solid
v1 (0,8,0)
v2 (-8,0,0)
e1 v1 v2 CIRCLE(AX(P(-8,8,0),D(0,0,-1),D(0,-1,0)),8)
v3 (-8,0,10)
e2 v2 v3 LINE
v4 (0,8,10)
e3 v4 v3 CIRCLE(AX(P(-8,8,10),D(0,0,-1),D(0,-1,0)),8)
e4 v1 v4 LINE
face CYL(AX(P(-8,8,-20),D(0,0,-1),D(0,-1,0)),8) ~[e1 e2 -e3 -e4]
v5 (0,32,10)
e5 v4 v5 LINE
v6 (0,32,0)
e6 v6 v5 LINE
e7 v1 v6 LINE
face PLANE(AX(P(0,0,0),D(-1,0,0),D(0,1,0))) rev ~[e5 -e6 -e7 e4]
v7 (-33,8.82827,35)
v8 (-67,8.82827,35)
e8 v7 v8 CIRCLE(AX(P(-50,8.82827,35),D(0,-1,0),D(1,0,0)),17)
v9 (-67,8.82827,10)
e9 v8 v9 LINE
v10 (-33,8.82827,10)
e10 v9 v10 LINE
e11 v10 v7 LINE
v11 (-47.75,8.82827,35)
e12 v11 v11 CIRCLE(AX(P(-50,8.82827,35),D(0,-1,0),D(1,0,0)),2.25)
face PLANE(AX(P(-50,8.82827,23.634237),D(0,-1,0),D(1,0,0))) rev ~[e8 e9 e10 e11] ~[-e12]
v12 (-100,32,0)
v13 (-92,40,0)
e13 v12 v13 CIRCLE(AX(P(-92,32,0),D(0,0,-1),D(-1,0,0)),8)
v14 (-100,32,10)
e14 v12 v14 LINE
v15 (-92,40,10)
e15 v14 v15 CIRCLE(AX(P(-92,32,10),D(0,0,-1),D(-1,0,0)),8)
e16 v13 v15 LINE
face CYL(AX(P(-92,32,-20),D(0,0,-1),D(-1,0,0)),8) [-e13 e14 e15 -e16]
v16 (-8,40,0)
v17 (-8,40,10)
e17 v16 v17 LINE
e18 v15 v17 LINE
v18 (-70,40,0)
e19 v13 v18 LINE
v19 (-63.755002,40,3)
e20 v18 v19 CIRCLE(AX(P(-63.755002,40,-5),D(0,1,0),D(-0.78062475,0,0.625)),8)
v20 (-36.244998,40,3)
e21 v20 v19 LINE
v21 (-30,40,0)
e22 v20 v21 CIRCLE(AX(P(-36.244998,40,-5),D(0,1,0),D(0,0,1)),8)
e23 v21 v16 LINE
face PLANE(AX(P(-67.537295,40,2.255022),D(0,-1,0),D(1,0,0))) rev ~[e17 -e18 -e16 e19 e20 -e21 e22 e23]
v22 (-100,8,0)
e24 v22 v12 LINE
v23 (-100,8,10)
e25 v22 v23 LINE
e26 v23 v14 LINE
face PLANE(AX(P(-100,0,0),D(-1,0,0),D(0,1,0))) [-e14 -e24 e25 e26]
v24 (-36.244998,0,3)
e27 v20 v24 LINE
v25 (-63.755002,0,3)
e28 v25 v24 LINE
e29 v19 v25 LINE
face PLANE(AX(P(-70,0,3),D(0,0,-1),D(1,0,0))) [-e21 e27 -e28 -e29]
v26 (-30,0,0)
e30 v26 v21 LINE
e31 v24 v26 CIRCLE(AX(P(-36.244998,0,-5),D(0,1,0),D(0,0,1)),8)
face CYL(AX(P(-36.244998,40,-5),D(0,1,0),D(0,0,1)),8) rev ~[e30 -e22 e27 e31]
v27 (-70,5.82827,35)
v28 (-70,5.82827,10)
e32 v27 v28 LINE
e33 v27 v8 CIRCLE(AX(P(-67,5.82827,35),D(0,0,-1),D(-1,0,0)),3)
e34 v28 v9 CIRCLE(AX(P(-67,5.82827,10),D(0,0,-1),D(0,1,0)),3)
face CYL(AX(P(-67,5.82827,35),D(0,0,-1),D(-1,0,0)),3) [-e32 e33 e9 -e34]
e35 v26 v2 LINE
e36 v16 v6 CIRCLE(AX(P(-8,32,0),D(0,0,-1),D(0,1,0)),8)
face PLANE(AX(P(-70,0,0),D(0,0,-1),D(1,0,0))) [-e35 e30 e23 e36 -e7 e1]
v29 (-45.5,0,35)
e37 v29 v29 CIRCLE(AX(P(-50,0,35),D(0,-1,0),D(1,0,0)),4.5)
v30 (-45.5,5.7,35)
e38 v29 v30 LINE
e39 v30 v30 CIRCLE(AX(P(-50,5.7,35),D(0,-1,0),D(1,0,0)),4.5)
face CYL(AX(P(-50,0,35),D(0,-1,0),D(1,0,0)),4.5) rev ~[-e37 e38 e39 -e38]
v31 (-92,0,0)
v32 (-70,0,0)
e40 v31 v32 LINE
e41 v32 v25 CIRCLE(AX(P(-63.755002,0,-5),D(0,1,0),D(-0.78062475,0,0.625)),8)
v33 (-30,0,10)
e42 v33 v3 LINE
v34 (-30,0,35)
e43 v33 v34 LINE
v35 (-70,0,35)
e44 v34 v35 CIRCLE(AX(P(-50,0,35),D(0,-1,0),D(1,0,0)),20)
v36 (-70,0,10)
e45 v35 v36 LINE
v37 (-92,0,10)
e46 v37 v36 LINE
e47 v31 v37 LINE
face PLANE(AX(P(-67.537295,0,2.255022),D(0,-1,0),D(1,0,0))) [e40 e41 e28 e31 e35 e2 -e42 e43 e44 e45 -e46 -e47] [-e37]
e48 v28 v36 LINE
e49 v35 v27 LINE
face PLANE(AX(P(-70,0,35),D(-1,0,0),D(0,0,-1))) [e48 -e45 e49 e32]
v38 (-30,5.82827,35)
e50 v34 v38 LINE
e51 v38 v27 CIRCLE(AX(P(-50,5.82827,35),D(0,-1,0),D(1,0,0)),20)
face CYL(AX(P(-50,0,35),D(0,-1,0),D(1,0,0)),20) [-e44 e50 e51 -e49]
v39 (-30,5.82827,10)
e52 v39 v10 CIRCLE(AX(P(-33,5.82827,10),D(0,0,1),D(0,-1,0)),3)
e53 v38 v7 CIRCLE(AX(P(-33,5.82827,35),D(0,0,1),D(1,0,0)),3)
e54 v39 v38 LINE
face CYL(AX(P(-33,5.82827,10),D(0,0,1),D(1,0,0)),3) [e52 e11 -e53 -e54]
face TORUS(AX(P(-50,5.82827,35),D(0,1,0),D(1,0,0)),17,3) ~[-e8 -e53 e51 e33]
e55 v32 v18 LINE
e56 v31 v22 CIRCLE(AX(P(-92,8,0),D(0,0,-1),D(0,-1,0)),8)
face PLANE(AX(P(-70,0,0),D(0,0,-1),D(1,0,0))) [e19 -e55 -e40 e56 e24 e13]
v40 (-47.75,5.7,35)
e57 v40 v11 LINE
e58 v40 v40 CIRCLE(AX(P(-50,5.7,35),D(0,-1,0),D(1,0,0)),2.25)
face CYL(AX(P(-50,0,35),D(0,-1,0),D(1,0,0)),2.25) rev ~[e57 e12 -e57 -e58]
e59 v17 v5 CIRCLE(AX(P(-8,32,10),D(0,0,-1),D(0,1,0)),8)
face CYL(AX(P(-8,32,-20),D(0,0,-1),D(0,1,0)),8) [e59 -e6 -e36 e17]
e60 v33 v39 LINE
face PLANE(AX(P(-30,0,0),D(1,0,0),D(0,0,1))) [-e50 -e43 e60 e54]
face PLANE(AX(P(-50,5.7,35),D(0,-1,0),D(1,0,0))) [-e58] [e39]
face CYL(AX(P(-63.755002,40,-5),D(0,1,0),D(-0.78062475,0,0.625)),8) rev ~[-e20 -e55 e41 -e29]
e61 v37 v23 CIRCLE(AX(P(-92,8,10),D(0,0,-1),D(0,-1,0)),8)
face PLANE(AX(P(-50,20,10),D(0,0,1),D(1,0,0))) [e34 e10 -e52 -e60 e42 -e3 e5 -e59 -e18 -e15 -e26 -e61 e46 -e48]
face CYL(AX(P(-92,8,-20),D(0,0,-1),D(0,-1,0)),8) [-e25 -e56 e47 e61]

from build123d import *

# Parameters (mm, degrees)
F0_W         = 100
F0_H         = 40
F1_DEPTH     = 10
F3_DEPTH     = 8.82827
F4_W         = 40
F4_H         = 3
F5_DEPTH     = 40.001
F6_R         = 2.25
F7_DEPTH     = 40.001
F8_R         = 4.5
F9_DEPTH     = 5.7
F10_T1_DEPTH = 40
F10_T3_DEPTH = 50
F10_T5_DEPTH = 50
F10_T7_DEPTH = 50
F10_T9_DEPTH = 50
F11_T1_DEPTH = 40
F12_R        = 3


# Not quite as in the source:
# - a fillet or chamfer that OpenCascade refuses, or shapes differently, is made with other operations: its cross-section is extruded or revolved along the edge and cut away or added


with BuildPart() as f1:
    # F0 (on Top) → F1 (new body)
    with BuildSketch(Plane.XY):
        with Locations((-50, 20)):
            Rectangle(F0_W, F0_H)
    extrude(amount=F1_DEPTH)

    # F2 (on face) → F3 (join)
    with BuildSketch(Plane.XZ):
        with BuildLine():
            ThreePointArc((-30, 35), (-50, 55), (-70, 35))
            Line((-70, 35), (-70, 0))
            Line((-70, 0), (-30, 0))
            Line((-30, 0), (-30, 35))
        make_face()
    extrude(amount=-F3_DEPTH)

    # F4 (on Front) → F5 (cut, through all)
    with BuildSketch(Plane.XZ):
        with Locations((-50, 1.5)):
            Rectangle(F4_W, F4_H)
    extrude(amount=-F5_DEPTH, mode=Mode.SUBTRACT)

    # F6 (on face) → F7 (cut, through all)
    with BuildSketch(Plane.XZ):
        with Locations((-50, 35)):
            Circle(F6_R)
    extrude(amount=-F7_DEPTH, mode=Mode.SUBTRACT)

    # F8 (on face) → F9 (cut)
    with BuildSketch(Plane.XZ):
        with Locations((-50, 35)):
            Circle(F8_R)
    extrude(amount=-F9_DEPTH, mode=Mode.SUBTRACT)

    # F10: fillet of radius 8 on 5 edges, made by hand

    # F10_s2 → F10_t1 (join)
    with BuildSketch(Plane.XZ.offset(-40)):
        with BuildLine():
            ThreePointArc((-36.2449979984, 3), (-32.7808963833, 2.2111025509), (-30, 0))
            Line((-30, 0), (-30, 3))
            Line((-30, 3), (-36.2449979984, 3))
        make_face()
    extrude(amount=F10_T1_DEPTH)

    # F10_s4 → F10_t3 (cut)
    with BuildSketch(Plane.XY.offset(-20)):
        with BuildLine():
            ThreePointArc((-92, 0), (-97.6568542495, 2.3431457505), (-100, 8))
            Line((-100, 8), (-100, 0))
            Line((-100, 0), (-92, 0))
        make_face()
    extrude(amount=F10_T3_DEPTH, mode=Mode.SUBTRACT)

    # F10_s6 → F10_t5 (cut)
    with BuildSketch(Plane.XY.offset(-20)):
        with BuildLine():
            ThreePointArc((-8, 0), (-2.3431457505, 2.3431457505), (0, 8))
            Line((0, 8), (0, 0))
            Line((0, 0), (-8, 0))
        make_face()
    extrude(amount=F10_T5_DEPTH, mode=Mode.SUBTRACT)

    # F10_s8 → F10_t7 (cut)
    with BuildSketch(Plane.XY.offset(-20)):
        with BuildLine():
            ThreePointArc((-100, 32), (-97.6568542495, 37.6568542495), (-92, 40))
            Line((-92, 40), (-100, 40))
            Line((-100, 40), (-100, 32))
        make_face()
    extrude(amount=F10_T7_DEPTH, mode=Mode.SUBTRACT)

    # F10_s10 → F10_t9 (cut)
    with BuildSketch(Plane.XY.offset(-20)):
        with BuildLine():
            ThreePointArc((-8, 40), (-2.3431457505, 37.6568542495), (0, 32))
            Line((0, 32), (0, 40))
            Line((0, 40), (-8, 40))
        make_face()
    extrude(amount=F10_T9_DEPTH, mode=Mode.SUBTRACT)

    # F11: fillet of radius 8 on 1 edges, made by hand

    # F11_s2 → F11_t1 (join)
    with BuildSketch(Plane.XZ.offset(-40)):
        with BuildLine():
            ThreePointArc((-70, 0), (-67.2191036167, 2.2111025509), (-63.7550020016, 3))
            Line((-63.7550020016, 3), (-70, 3))
            Line((-70, 3), (-70, 0))
        make_face()
    extrude(amount=F11_T1_DEPTH)

    # F12
    f12_edges = [f1.edges().sort_by_distance(p)[0] for p in [
        (-50, 8.82827, 55),
        (-30, 8.82827, 22.5),
        (-70, 8.82827, 22.5),
    ]]
    fillet(f12_edges, radius=F12_R)


solid = f1.part
